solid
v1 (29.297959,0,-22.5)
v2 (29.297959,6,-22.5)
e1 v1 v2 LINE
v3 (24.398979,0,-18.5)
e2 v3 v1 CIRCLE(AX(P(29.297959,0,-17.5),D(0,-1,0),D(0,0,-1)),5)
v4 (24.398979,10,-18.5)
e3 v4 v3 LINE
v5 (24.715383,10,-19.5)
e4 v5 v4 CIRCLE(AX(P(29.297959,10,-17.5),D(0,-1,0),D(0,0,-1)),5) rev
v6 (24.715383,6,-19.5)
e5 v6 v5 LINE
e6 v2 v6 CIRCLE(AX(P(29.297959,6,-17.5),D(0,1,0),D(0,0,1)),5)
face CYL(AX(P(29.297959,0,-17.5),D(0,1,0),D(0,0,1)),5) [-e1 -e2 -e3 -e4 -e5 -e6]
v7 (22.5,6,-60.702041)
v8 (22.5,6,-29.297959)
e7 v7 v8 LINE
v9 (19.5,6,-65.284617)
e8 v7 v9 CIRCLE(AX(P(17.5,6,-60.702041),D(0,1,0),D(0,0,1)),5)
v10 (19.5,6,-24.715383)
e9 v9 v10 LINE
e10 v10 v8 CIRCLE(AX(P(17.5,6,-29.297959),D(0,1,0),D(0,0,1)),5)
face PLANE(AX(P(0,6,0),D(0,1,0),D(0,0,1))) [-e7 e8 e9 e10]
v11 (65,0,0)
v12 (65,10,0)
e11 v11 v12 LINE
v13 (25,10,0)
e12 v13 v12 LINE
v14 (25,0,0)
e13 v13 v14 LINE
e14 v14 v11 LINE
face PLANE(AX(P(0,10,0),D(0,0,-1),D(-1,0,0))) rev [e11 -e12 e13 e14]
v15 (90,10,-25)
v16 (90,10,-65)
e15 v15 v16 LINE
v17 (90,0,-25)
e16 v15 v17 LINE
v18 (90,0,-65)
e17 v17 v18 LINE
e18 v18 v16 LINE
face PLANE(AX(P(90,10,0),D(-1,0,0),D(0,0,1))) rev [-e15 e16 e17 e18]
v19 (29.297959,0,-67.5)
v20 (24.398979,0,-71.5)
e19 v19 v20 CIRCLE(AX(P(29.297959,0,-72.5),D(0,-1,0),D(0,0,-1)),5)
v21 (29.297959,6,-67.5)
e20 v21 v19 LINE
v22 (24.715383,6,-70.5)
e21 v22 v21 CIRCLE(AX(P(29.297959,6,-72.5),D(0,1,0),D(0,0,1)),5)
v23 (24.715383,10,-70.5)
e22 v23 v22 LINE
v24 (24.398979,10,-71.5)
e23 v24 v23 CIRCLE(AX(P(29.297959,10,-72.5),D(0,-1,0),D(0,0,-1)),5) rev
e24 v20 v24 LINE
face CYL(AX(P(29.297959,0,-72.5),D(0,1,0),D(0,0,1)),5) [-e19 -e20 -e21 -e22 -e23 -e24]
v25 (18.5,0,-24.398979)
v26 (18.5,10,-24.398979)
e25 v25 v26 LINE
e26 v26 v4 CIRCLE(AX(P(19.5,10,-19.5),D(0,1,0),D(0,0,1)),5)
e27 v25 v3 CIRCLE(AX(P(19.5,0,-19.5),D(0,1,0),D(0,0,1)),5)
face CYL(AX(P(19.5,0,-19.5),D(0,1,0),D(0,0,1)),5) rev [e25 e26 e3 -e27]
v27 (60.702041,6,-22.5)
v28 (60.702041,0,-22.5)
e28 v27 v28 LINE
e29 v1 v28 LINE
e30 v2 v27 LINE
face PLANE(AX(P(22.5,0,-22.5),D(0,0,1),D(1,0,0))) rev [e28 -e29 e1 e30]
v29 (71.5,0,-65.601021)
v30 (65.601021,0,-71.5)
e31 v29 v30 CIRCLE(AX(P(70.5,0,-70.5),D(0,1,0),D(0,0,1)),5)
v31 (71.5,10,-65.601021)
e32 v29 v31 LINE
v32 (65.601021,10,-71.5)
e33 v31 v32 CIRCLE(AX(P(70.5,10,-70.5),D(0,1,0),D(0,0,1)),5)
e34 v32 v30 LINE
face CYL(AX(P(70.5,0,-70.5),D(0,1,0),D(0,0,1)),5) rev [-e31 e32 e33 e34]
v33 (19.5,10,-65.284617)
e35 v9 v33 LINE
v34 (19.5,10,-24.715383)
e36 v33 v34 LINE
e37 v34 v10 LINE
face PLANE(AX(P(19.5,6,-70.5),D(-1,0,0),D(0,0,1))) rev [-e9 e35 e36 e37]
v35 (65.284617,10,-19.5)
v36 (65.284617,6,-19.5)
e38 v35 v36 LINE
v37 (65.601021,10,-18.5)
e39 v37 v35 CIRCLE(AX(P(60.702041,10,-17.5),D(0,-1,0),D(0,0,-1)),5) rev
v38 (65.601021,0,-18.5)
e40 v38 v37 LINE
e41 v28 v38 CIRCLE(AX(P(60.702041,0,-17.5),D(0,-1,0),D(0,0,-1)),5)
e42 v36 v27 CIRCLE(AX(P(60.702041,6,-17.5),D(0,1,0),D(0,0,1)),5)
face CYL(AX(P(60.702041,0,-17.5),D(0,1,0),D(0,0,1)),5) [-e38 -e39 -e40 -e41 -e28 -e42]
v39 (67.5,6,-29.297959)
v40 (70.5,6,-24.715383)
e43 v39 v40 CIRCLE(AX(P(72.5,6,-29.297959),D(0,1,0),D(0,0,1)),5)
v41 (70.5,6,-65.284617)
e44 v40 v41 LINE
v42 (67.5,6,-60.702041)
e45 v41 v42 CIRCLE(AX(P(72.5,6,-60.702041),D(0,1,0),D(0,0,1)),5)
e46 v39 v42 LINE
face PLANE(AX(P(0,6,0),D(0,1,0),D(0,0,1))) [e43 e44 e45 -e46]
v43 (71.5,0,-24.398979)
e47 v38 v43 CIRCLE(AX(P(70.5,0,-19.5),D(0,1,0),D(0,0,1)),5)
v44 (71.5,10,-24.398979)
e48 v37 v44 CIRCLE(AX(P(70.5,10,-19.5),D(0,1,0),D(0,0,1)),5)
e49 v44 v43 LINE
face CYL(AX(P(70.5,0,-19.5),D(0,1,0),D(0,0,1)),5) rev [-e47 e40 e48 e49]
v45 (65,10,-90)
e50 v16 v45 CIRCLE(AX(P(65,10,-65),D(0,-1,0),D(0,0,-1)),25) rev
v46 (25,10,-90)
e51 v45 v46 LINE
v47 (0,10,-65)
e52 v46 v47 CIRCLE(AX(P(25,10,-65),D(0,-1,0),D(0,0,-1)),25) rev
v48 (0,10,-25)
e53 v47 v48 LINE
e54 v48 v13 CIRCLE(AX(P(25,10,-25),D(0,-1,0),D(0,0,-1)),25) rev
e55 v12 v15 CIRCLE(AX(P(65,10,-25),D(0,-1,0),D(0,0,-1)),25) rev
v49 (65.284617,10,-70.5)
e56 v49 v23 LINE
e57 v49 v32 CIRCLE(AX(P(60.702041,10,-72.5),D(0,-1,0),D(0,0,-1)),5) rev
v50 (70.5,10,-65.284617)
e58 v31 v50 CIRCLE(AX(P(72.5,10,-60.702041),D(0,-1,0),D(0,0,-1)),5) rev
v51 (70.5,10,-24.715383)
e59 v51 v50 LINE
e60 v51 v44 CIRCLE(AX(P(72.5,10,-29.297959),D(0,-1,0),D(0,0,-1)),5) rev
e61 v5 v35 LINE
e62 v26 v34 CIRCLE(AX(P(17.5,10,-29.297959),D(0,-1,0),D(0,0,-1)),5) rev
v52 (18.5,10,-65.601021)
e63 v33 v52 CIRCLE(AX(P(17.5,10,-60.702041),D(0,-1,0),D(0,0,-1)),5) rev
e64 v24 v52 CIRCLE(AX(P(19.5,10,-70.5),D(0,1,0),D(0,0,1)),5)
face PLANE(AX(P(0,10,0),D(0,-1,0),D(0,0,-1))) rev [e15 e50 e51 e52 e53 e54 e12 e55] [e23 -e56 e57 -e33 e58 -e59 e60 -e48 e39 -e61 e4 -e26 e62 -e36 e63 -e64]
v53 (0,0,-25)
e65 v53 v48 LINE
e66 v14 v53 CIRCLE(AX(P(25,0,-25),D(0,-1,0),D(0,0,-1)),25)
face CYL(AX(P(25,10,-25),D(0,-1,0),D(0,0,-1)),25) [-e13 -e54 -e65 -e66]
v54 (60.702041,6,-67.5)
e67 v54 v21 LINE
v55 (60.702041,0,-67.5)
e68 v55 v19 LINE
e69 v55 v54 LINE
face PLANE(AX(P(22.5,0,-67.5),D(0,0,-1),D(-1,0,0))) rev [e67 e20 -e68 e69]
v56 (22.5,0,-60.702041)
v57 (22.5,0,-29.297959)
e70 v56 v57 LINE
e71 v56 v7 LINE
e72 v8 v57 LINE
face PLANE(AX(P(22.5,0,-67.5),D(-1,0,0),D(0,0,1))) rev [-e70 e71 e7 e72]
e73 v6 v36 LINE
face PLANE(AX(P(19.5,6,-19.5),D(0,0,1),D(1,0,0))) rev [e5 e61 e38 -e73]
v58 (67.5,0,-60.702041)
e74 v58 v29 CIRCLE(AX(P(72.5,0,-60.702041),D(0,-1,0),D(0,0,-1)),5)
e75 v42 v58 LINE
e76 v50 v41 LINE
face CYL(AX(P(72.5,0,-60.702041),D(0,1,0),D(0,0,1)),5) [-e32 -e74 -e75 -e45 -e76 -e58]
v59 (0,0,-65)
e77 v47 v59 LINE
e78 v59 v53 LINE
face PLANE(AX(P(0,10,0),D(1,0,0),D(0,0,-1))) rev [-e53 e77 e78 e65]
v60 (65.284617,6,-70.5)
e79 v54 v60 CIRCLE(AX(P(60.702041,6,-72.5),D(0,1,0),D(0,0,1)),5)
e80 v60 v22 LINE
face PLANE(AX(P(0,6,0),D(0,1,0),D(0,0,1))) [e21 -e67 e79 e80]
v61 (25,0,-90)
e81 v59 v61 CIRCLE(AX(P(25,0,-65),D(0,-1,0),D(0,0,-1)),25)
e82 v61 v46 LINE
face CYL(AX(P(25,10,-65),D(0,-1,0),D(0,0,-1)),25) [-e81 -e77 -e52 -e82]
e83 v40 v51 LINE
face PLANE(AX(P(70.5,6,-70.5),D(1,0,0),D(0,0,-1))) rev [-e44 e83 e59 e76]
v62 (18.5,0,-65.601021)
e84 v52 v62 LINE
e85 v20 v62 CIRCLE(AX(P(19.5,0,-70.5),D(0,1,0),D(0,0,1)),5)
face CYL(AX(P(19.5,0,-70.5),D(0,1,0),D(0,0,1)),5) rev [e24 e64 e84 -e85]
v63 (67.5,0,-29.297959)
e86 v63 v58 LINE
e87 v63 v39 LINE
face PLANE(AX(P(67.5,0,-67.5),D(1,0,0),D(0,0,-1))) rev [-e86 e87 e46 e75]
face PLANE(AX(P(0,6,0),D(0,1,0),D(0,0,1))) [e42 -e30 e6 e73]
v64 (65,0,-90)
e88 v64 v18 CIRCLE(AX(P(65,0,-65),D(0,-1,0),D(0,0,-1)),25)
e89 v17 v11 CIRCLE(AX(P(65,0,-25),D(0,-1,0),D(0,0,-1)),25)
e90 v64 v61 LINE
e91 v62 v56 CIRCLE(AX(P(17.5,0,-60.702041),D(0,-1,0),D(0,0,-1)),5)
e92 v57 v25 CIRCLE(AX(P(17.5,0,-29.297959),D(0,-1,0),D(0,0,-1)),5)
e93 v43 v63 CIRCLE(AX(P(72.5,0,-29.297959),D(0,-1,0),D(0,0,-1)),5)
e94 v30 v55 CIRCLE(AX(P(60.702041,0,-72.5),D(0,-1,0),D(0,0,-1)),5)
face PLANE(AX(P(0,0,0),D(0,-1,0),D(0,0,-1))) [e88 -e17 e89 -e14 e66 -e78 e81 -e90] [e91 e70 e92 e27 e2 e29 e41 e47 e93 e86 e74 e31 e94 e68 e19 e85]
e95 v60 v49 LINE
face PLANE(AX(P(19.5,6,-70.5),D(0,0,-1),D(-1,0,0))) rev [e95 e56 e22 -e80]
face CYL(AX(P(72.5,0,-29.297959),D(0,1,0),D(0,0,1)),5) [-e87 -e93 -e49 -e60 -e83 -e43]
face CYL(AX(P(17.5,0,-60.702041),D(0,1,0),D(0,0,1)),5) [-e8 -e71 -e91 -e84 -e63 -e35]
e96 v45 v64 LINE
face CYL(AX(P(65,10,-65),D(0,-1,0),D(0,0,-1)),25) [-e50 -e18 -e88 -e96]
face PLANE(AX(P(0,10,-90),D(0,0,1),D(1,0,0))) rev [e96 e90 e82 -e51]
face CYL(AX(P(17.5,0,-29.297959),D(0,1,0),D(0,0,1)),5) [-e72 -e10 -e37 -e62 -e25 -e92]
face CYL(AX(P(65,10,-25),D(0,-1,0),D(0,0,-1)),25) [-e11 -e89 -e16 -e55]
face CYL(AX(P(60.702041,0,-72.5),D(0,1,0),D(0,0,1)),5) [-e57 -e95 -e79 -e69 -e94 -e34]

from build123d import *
from build123d.topology import SkipClean

# Parameters (mm, degrees)
CROQUIS1_W              = 90
CROQUIS1_H              = 90
SALIENTE_EXTRUIR1_DEPTH = 10
CROQUIS2_W              = 51
CROQUIS2_H              = 51
CORTAR_EXTRUIR1_DEPTH   = 4
CROQUIS3_W              = 45
CROQUIS3_H              = 45
CORTAR_EXTRUIR2_DEPTH   = 128.42056349
CROQUIS4_R              = 5
CORTAR_EXTRUIR3_DEPTH   = 128.671453348
REDONDEO1_R             = 5
REDONDEO2_R             = 25


with BuildPart() as part:
    # Croquis1 → Saliente-Extruir1 (new body)
    with BuildSketch(Plane(origin=(0, 0, 0), x_dir=(1, 0, 0), z_dir=(0, 1, 0))):
        with Locations((45, 45)):
            Rectangle(CROQUIS1_W, CROQUIS1_H)
    extrude(amount=SALIENTE_EXTRUIR1_DEPTH)

    # Croquis2 → Cortar-Extruir1 (cut)
    with BuildSketch(Plane(origin=(0, 10, 0), x_dir=(1, 0, 0), z_dir=(0, 1, 0))):
        with Locations((45, 45)):
            Rectangle(CROQUIS2_W, CROQUIS2_H)
    extrude(amount=-CORTAR_EXTRUIR1_DEPTH, mode=Mode.SUBTRACT)

    # Croquis3 → Cortar-Extruir2 (cut, through all)
    with BuildSketch(Plane(origin=(0, 6, 0), x_dir=(1, 0, 0), z_dir=(0, 1, 0))):
        with Locations((45, 45)):
            Rectangle(CROQUIS3_W, CROQUIS3_H)
    extrude(amount=-CORTAR_EXTRUIR2_DEPTH, mode=Mode.SUBTRACT)

    # Croquis4 → Cortar-Extruir3 (cut, through all)
    with SkipClean():  # the faces are left unmerged after this step: merging them gives an invalid solid
        with BuildSketch(Plane(origin=(0, 10, 0), x_dir=(1, 0, 0), z_dir=(0, 1, 0))):
            with Locations((19.5, 70.5)):
                Circle(CROQUIS4_R)
            with Locations((70.5, 70.5)):
                Circle(CROQUIS4_R)
            with Locations((19.5, 19.5)):
                Circle(CROQUIS4_R)
            with Locations((70.5, 19.5)):
                Circle(CROQUIS4_R)
        extrude(amount=-CORTAR_EXTRUIR3_DEPTH, mode=Mode.SUBTRACT)
    add(part.part.scale(1), mode=Mode.REPLACE)  # the faces are merged on a copy

    # Redondeo1
    redondeo1_edges = [part.edges().sort_by_distance(p)[0] for p in [
        (23.5, 3, -67.5),
        (22.5, 3, -66.5),
        (67.5, 3, -66.5),
        (66.5, 3, -67.5),
        (22.5, 3, -23.5),
        (23.5, 3, -22.5),
        (66.5, 3, -22.5),
        (67.5, 3, -23.5),
    ]]
    fillet(redondeo1_edges, radius=REDONDEO1_R)

    # Redondeo2
    redondeo2_edges = [part.edges().sort_by_distance(p)[0] for p in [
        (0, 5, -90),
        (90, 5, -90),
        (90, 5, 0),
        (0, 5, 0),
    ]]
    fillet(redondeo2_edges, radius=REDONDEO2_R)


solid = part.part
